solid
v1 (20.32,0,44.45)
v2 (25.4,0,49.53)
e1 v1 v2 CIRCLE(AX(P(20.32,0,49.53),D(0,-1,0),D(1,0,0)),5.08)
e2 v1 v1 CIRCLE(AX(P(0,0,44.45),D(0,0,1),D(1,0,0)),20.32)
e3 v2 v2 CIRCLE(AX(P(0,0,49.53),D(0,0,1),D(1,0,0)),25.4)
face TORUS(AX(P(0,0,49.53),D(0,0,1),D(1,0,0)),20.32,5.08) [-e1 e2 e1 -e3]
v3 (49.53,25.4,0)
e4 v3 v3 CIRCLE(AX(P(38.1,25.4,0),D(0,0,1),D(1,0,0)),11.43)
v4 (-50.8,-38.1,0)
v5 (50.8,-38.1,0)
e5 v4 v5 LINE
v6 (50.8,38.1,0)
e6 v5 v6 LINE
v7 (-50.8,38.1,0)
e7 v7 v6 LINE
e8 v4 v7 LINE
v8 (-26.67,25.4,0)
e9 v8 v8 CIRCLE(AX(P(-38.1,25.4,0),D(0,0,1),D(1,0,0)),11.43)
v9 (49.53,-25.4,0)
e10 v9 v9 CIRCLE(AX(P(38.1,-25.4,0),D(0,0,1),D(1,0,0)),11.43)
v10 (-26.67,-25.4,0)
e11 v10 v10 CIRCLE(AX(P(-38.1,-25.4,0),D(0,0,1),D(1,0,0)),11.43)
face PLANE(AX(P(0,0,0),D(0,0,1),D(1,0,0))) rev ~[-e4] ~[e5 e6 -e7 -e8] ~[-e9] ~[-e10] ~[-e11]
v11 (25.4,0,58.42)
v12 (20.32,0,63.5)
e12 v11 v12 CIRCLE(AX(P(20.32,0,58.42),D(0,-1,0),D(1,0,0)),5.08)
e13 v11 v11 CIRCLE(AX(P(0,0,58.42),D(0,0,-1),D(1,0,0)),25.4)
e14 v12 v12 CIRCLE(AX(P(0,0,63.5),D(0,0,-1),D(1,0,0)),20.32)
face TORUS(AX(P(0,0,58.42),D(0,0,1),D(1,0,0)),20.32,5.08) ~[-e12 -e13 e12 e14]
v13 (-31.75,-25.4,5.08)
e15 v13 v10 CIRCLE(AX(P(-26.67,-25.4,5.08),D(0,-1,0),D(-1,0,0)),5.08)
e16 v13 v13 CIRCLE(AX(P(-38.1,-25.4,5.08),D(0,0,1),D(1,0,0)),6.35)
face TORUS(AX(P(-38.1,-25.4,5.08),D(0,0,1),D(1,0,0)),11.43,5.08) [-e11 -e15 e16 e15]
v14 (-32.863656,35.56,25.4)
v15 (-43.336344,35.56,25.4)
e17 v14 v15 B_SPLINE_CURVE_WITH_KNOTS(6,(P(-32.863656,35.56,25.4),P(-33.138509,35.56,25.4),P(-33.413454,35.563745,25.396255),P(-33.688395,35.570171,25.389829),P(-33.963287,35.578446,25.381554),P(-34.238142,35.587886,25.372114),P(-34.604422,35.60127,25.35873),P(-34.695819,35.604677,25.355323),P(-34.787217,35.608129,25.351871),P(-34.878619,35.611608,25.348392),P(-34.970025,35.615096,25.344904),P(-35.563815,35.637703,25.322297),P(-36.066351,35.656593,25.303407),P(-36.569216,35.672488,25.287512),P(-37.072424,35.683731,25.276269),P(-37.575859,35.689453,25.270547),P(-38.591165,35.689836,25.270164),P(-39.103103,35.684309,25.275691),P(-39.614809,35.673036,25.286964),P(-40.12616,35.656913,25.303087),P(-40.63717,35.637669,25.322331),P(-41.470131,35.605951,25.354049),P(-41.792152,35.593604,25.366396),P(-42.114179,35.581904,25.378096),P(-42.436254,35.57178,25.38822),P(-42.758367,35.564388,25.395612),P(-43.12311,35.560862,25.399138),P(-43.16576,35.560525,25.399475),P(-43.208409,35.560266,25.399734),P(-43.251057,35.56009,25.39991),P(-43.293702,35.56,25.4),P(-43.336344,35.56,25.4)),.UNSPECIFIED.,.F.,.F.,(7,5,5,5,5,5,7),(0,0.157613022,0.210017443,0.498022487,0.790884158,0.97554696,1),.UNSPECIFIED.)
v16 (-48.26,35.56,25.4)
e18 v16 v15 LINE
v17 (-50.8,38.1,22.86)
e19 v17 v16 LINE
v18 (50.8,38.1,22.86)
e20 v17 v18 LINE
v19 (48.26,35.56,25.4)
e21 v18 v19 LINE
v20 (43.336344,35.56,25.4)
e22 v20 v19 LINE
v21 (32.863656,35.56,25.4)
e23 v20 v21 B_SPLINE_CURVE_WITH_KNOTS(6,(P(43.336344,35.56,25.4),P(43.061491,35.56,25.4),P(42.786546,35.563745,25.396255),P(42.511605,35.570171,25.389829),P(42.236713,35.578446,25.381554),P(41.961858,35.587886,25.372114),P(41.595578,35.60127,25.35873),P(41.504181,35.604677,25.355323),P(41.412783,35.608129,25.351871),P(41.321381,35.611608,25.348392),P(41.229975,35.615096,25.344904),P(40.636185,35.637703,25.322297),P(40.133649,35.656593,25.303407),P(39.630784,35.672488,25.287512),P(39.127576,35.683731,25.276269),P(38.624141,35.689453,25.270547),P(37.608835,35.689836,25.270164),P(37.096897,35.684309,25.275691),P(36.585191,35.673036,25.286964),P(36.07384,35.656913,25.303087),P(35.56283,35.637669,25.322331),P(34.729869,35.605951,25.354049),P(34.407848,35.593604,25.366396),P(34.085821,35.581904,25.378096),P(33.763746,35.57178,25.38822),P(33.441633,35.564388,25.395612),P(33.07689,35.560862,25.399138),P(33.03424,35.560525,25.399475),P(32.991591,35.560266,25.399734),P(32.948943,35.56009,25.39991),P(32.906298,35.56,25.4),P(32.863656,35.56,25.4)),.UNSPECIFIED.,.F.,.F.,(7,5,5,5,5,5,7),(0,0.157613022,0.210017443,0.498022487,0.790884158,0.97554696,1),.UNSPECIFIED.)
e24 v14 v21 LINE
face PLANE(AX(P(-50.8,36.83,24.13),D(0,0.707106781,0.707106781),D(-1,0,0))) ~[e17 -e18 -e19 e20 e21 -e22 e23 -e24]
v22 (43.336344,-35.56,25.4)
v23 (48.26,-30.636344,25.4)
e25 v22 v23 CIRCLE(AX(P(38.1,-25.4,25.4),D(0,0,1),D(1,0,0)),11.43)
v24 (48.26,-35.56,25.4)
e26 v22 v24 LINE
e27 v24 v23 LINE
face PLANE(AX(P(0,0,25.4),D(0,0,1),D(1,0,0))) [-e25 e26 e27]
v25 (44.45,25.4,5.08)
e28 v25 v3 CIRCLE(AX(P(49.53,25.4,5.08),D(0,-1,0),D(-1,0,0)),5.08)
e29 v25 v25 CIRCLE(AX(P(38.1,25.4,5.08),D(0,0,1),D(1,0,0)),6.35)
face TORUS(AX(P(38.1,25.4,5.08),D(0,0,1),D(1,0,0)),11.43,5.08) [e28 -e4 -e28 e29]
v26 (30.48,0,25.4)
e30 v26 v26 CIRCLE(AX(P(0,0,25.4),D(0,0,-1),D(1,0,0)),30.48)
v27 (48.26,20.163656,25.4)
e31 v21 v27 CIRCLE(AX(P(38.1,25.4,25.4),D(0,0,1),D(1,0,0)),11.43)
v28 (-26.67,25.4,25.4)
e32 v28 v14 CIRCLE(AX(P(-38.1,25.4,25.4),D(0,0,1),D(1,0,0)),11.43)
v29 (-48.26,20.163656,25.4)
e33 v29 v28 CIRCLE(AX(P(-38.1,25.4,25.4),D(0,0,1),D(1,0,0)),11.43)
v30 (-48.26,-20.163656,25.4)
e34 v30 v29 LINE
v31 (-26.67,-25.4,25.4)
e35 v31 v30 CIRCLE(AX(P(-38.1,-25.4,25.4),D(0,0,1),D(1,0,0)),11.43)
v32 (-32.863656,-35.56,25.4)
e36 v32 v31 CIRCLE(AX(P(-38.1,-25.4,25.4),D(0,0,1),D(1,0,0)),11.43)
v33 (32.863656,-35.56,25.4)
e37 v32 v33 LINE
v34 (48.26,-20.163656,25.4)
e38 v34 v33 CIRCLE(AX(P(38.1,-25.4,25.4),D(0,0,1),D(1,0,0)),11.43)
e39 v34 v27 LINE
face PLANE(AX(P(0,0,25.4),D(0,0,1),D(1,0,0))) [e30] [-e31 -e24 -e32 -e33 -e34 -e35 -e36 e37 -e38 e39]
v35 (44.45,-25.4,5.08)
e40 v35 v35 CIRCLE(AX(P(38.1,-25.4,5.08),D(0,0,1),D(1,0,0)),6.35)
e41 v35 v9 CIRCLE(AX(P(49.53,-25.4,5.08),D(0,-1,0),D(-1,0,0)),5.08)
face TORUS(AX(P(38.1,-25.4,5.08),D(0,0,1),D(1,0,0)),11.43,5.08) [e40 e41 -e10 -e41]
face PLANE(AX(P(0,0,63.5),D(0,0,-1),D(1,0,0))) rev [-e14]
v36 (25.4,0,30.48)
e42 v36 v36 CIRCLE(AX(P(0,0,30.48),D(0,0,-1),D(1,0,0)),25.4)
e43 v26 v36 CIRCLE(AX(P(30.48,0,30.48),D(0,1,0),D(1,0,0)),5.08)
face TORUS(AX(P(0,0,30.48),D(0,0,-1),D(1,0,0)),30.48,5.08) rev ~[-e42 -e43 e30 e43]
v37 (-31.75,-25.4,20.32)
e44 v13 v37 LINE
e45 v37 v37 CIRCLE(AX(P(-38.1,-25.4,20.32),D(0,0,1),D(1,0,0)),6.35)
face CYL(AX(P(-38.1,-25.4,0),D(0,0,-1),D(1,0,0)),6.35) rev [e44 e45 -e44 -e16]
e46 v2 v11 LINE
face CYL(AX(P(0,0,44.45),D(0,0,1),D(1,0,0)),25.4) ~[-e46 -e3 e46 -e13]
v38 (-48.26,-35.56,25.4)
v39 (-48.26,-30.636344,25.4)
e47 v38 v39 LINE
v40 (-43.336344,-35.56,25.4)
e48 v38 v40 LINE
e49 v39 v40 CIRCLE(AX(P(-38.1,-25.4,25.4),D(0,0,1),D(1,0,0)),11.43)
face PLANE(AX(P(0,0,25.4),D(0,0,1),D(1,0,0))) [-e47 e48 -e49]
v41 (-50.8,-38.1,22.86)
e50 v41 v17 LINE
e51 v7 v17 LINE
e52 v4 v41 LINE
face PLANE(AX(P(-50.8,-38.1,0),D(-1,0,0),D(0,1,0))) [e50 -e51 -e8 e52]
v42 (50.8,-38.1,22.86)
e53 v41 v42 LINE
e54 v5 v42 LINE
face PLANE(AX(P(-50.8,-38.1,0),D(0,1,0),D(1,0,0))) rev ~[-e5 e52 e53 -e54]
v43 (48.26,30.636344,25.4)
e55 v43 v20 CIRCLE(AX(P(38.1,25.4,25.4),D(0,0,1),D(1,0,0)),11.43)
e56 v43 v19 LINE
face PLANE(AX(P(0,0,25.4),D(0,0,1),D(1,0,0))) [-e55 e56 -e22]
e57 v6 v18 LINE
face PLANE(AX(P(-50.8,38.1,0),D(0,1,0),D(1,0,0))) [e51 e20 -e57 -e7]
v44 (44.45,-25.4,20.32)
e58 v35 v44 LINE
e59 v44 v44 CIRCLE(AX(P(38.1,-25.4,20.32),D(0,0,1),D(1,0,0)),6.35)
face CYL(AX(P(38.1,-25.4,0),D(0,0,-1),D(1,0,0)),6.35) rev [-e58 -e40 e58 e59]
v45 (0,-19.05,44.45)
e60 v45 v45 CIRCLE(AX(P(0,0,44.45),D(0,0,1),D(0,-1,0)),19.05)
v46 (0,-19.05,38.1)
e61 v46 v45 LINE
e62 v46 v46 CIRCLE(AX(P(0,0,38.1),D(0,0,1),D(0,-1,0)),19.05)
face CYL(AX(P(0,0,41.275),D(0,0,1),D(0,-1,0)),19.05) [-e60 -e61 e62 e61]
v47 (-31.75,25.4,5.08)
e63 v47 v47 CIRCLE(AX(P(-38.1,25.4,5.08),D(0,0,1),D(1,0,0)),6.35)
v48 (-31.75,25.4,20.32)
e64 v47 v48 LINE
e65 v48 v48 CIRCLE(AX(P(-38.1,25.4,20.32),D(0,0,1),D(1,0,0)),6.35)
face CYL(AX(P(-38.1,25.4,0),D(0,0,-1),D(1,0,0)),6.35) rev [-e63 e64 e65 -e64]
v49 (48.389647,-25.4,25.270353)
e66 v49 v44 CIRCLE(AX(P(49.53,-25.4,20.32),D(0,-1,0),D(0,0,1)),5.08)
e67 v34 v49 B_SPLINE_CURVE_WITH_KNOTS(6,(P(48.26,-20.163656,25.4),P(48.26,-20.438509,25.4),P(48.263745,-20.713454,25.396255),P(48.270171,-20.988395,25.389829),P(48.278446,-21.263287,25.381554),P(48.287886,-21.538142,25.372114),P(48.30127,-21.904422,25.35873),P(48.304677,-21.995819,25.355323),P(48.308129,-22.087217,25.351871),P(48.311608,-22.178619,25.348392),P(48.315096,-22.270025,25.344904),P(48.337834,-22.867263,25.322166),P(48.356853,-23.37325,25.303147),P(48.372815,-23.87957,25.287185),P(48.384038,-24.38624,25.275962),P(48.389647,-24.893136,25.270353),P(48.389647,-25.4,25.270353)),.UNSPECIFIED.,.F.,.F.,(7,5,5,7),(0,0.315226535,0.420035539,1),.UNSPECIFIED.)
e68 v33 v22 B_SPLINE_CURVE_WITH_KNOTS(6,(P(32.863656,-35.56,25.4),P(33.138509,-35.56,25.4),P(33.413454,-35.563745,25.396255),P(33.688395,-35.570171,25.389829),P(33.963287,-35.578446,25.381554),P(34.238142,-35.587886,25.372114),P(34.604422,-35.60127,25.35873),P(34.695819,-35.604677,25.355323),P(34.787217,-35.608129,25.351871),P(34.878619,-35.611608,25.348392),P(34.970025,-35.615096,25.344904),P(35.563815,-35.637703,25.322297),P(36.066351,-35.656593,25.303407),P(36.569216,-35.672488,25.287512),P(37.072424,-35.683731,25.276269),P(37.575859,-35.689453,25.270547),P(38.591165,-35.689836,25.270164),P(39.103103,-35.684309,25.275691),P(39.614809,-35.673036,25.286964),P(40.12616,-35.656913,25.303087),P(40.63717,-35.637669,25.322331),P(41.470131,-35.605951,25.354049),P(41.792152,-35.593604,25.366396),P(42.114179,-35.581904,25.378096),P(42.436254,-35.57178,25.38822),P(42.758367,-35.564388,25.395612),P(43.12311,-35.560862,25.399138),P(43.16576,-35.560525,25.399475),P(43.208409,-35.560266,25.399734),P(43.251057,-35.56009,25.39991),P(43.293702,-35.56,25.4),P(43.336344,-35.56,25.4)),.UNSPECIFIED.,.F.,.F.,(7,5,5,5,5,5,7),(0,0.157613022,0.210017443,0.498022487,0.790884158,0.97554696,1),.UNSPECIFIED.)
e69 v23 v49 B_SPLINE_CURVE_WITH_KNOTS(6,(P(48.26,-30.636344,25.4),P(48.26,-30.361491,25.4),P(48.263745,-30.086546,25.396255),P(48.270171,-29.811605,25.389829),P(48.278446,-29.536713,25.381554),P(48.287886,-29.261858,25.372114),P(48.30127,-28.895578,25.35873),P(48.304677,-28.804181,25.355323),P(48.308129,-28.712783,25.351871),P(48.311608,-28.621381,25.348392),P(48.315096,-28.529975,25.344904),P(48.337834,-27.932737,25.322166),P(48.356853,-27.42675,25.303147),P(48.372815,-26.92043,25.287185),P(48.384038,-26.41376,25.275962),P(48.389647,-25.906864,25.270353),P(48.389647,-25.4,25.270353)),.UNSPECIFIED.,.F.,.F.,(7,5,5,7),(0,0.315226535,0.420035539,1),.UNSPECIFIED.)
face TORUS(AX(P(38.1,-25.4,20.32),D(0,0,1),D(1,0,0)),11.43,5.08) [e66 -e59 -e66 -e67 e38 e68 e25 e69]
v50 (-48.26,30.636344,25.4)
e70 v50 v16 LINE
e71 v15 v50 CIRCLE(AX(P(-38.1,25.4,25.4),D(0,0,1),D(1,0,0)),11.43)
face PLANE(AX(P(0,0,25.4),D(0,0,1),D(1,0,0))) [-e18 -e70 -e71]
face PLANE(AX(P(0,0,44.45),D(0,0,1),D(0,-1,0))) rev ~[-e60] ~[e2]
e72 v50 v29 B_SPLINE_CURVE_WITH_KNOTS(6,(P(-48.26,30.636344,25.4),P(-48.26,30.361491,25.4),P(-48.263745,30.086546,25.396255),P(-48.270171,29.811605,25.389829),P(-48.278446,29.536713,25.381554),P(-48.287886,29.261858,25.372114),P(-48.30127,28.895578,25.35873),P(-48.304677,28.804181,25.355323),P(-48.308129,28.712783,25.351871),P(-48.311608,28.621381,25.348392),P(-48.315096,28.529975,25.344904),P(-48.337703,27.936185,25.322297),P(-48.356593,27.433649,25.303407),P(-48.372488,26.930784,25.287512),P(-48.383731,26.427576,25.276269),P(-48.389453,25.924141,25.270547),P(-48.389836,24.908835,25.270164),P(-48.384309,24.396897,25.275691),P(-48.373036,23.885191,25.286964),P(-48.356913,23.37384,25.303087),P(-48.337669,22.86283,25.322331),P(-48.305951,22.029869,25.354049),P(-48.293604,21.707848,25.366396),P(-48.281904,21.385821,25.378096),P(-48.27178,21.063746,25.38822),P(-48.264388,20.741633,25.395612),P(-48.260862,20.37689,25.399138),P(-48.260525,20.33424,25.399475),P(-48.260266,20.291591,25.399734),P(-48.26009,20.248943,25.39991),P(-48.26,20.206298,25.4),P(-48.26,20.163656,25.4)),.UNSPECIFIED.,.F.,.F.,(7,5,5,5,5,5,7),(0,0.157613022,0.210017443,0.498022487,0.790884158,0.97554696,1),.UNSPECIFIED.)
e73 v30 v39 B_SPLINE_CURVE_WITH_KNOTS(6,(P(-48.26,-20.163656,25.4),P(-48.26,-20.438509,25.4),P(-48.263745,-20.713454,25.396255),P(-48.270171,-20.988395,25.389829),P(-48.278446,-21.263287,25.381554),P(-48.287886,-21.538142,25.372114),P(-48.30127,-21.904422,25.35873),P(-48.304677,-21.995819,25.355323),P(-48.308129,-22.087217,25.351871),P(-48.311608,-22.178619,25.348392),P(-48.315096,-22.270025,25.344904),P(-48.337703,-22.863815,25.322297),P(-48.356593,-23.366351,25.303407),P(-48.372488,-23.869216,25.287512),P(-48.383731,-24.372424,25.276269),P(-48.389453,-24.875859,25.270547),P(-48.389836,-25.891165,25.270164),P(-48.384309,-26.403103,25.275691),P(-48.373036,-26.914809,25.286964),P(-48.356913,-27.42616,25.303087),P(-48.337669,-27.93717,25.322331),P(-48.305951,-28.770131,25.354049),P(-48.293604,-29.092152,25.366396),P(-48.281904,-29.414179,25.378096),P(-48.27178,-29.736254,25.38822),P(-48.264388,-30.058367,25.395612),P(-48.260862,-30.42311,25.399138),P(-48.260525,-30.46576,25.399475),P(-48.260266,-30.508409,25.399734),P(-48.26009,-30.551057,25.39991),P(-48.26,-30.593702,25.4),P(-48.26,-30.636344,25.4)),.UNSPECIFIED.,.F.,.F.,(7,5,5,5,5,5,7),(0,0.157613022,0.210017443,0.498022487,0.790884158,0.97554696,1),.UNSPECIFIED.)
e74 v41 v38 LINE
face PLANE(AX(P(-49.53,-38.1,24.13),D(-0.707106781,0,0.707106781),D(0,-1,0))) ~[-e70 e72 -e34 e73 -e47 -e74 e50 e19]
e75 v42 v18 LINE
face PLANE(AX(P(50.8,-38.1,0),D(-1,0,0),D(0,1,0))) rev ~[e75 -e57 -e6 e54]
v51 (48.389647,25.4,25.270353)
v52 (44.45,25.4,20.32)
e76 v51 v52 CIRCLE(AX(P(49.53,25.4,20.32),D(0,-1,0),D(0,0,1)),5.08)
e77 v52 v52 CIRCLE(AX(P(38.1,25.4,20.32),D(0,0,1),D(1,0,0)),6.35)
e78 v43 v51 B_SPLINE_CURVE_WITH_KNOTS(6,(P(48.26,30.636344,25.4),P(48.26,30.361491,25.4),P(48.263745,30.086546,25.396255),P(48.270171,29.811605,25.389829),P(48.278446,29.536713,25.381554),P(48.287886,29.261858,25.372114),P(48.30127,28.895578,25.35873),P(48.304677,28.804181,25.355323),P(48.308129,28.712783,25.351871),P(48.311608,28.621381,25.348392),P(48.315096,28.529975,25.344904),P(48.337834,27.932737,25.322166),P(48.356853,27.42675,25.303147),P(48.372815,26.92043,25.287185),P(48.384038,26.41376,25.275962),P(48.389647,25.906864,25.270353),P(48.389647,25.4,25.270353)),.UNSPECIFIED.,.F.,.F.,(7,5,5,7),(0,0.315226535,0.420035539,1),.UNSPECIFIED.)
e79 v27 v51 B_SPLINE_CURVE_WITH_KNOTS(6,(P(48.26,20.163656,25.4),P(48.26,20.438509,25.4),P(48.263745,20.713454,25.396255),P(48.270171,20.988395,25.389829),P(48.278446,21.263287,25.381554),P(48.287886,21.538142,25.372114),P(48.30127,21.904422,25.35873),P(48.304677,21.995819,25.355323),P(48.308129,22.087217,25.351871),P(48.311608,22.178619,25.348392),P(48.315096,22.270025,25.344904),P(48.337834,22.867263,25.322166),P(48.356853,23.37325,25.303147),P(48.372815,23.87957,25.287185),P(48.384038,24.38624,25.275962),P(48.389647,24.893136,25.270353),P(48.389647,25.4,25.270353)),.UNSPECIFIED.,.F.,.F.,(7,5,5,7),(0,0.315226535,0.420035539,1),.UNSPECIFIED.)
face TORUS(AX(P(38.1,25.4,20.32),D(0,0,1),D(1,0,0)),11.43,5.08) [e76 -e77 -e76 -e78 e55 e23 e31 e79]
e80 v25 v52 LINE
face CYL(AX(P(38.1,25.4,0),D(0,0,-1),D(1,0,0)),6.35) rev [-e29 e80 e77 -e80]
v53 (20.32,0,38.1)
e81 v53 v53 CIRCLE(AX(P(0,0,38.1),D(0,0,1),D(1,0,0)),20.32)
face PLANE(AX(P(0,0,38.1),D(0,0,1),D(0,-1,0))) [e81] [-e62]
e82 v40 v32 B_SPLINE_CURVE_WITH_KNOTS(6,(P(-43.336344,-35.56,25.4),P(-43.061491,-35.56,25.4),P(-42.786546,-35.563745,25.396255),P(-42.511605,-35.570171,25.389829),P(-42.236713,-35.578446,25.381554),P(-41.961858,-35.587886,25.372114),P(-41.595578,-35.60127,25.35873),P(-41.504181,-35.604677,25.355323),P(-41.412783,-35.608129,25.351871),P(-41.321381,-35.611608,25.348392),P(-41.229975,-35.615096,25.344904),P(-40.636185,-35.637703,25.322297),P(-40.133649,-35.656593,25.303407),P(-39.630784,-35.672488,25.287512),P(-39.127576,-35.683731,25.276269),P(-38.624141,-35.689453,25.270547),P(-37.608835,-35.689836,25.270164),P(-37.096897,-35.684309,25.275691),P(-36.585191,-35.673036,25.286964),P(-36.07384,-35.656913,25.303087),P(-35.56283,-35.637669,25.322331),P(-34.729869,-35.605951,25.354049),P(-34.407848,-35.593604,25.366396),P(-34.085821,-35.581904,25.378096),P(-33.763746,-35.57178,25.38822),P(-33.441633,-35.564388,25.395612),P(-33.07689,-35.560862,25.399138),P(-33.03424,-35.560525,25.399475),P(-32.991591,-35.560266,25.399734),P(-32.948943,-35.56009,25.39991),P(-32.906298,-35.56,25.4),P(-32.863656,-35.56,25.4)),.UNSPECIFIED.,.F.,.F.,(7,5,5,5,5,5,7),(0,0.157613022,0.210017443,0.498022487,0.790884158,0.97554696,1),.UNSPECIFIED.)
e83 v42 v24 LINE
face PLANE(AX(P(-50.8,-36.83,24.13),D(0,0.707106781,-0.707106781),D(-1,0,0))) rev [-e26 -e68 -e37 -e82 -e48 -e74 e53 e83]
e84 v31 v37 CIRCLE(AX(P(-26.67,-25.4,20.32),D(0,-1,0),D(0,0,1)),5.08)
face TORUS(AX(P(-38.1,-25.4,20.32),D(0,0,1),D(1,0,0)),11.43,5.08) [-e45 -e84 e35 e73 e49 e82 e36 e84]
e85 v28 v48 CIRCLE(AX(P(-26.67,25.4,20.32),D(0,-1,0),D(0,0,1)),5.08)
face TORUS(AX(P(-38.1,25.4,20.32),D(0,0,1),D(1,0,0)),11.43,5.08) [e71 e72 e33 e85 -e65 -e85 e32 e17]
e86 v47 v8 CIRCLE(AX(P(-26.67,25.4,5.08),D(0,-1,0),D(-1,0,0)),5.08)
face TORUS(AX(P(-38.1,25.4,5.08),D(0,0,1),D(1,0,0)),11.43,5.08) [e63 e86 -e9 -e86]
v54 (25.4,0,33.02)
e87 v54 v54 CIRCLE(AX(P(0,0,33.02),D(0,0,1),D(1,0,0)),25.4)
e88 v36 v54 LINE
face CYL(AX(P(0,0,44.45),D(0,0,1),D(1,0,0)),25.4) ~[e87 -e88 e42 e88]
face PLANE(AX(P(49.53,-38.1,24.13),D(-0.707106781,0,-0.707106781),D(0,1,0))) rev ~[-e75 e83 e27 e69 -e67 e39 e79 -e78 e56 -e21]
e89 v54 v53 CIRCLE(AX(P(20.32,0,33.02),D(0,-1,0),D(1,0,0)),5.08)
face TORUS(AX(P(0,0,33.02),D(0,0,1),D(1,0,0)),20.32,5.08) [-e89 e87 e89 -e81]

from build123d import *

# Parameters (mm, degrees)
F0_W          = 101.6
F0_H          = 76.2
F1_DEPTH      = 25.4
F2_R          = 6.35
F3_DEPTH      = 25.4
F3_DEPTH_BACK = 25.4
F4_W          = 25.4
F4_H          = 38.1
F6_W          = 19.05
F6_H          = 6.35
F8_SIZE       = 2.54
F9_R          = 5.08


# Not quite as in the source:
# - a fillet or chamfer that OpenCascade refuses, or shapes differently, is made with other operations: its cross-section is extruded or revolved along the edge and cut away or added


with BuildPart() as f1:
    # F0 (on Top) → F1 (new body)
    with BuildSketch(Plane.XY):
        Rectangle(F0_W, F0_H)
    extrude(amount=F1_DEPTH)

    # F2 (on Top) → F3 (cut, two sides)
    with BuildSketch(Plane.XY) as f3_sk:
        with Locations((-38.1, 25.4)):
            Circle(F2_R)
        with Locations((38.1, 25.4)):
            Circle(F2_R)
        with Locations((-38.1, -25.4)):
            Circle(F2_R)
        with Locations((38.1, -25.4)):
            Circle(F2_R)
    extrude(amount=-F3_DEPTH, mode=Mode.SUBTRACT)
    extrude(f3_sk.sketch, amount=F3_DEPTH_BACK, mode=Mode.SUBTRACT)

    # F4 (on Front) → F5 (revolve)
    with BuildSketch(Plane.XZ):
        with Locations((12.7, 44.45)):
            Rectangle(F4_W, F4_H)
    revolve(axis=Axis((0, 0, 44.45), (0, 0, -1)))

    # F6 (on Right) → F7 (revolve, cut)
    with BuildSketch(Plane.YZ):
        with Locations((-28.575, 41.275)):
            Rectangle(F6_W, F6_H)
    revolve(axis=Axis((0, 0, 25.4), (0, 0, 1)), mode=Mode.SUBTRACT)

    # F8
    f8_edges = [f1.edges().sort_by_distance(p)[0] for p in [
        (0, -38.1, 25.4),
        (-50.8, 0, 25.4),
        (0, 38.1, 25.4),
        (50.8, 0, 25.4),
    ]]
    chamfer(f8_edges, length=F8_SIZE)

    # F9
    f9_edges = [f1.edges().sort_by_distance(p)[0] for p in [
        (-25.4, 0, 25.4),
        (-25.4, 0, 44.45),
        (-25.4, 0, 38.1),
        (-25.4, 0, 63.5),
    ]]
    fillet(f9_edges, radius=F9_R)

    # F10: fillet of radius 5.08 on 9 edges, made by hand

    # F10_s1 → F10_t2 (revolve, cut)
    with BuildSketch(Plane.XZ.offset(-25.4)):
        with BuildLine():
            ThreePointArc((49.53, 25.4), (45.9378975516, 23.9121024484), (44.45, 20.32))
            Line((44.45, 20.32), (44.45, 25.4))
            Line((44.45, 25.4), (49.53, 25.4))
        make_face()
    revolve(axis=Axis((38.1, 25.4, 25.4), (0, 0, 1)), mode=Mode.SUBTRACT)

    # F10_s3 → F10_t4 (revolve, cut)
    with BuildSketch(Plane.XZ.offset(25.4)):
        with BuildLine():
            ThreePointArc((49.53, 25.4), (45.9378975516, 23.9121024484), (44.45, 20.32))
            Line((44.45, 20.32), (44.45, 25.4))
            Line((44.45, 25.4), (49.53, 25.4))
        make_face()
    revolve(axis=Axis((38.1, -25.4, 25.4), (0, 0, 1)), mode=Mode.SUBTRACT)

    # F10_s5 → F10_t6 (revolve, cut)
    with BuildSketch(Plane.XZ.offset(25.4)):
        with BuildLine():
            ThreePointArc((-26.67, 25.4), (-30.2621024484, 23.9121024484), (-31.75, 20.32))
            Line((-31.75, 20.32), (-31.75, 25.4))
            Line((-31.75, 25.4), (-26.67, 25.4))
        make_face()
    revolve(axis=Axis((-38.1, -25.4, 25.4), (0, 0, 1)), mode=Mode.SUBTRACT)

    # F10_s7 → F10_t8 (revolve, cut)
    with BuildSketch(Plane.XZ.offset(-25.4)):
        with BuildLine():
            ThreePointArc((-26.67, 25.4), (-30.2621024484, 23.9121024484), (-31.75, 20.32))
            Line((-31.75, 20.32), (-31.75, 25.4))
            Line((-31.75, 25.4), (-26.67, 25.4))
        make_face()
    revolve(axis=Axis((-38.1, 25.4, 25.4), (0, 0, 1)), mode=Mode.SUBTRACT)

    # F10_s9 → F10_t10 (revolve, cut)
    with BuildSketch(Plane.XZ.offset(-25.4)):
        with BuildLine():
            ThreePointArc((44.45, 5.08), (45.9378975516, 1.4878975516), (49.53, 0))
            Line((49.53, 0), (44.45, 0))
            Line((44.45, 0), (44.45, 5.08))
        make_face()
    revolve(axis=Axis((38.1, 25.4, 0), (0, 0, 1)), mode=Mode.SUBTRACT)

    # F10_s11 → F10_t12 (revolve, cut)
    with BuildSketch(Plane.XZ.offset(25.4)):
        with BuildLine():
            ThreePointArc((44.45, 5.08), (45.9378975516, 1.4878975516), (49.53, 0))
            Line((49.53, 0), (44.45, 0))
            Line((44.45, 0), (44.45, 5.08))
        make_face()
    revolve(axis=Axis((38.1, -25.4, 0), (0, 0, 1)), mode=Mode.SUBTRACT)

    # F10_s13 → F10_t14 (revolve, cut)
    with BuildSketch(Plane.XZ.offset(25.4)):
        with BuildLine():
            ThreePointArc((-31.75, 5.08), (-30.2621024484, 1.4878975516), (-26.67, 0))
            Line((-26.67, 0), (-31.75, 0))
            Line((-31.75, 0), (-31.75, 5.08))
        make_face()
    revolve(axis=Axis((-38.1, -25.4, 0), (0, 0, 1)), mode=Mode.SUBTRACT)

    # F10_s15 → F10_t16 (revolve, cut)
    with BuildSketch(Plane.XZ.offset(-25.4)):
        with BuildLine():
            ThreePointArc((-31.75, 5.08), (-30.2621024484, 1.4878975516), (-26.67, 0))
            Line((-26.67, 0), (-31.75, 0))
            Line((-31.75, 0), (-31.75, 5.08))
        make_face()
    revolve(axis=Axis((-38.1, 25.4, 0), (0, 0, 1)), mode=Mode.SUBTRACT)


solid = f1.part
